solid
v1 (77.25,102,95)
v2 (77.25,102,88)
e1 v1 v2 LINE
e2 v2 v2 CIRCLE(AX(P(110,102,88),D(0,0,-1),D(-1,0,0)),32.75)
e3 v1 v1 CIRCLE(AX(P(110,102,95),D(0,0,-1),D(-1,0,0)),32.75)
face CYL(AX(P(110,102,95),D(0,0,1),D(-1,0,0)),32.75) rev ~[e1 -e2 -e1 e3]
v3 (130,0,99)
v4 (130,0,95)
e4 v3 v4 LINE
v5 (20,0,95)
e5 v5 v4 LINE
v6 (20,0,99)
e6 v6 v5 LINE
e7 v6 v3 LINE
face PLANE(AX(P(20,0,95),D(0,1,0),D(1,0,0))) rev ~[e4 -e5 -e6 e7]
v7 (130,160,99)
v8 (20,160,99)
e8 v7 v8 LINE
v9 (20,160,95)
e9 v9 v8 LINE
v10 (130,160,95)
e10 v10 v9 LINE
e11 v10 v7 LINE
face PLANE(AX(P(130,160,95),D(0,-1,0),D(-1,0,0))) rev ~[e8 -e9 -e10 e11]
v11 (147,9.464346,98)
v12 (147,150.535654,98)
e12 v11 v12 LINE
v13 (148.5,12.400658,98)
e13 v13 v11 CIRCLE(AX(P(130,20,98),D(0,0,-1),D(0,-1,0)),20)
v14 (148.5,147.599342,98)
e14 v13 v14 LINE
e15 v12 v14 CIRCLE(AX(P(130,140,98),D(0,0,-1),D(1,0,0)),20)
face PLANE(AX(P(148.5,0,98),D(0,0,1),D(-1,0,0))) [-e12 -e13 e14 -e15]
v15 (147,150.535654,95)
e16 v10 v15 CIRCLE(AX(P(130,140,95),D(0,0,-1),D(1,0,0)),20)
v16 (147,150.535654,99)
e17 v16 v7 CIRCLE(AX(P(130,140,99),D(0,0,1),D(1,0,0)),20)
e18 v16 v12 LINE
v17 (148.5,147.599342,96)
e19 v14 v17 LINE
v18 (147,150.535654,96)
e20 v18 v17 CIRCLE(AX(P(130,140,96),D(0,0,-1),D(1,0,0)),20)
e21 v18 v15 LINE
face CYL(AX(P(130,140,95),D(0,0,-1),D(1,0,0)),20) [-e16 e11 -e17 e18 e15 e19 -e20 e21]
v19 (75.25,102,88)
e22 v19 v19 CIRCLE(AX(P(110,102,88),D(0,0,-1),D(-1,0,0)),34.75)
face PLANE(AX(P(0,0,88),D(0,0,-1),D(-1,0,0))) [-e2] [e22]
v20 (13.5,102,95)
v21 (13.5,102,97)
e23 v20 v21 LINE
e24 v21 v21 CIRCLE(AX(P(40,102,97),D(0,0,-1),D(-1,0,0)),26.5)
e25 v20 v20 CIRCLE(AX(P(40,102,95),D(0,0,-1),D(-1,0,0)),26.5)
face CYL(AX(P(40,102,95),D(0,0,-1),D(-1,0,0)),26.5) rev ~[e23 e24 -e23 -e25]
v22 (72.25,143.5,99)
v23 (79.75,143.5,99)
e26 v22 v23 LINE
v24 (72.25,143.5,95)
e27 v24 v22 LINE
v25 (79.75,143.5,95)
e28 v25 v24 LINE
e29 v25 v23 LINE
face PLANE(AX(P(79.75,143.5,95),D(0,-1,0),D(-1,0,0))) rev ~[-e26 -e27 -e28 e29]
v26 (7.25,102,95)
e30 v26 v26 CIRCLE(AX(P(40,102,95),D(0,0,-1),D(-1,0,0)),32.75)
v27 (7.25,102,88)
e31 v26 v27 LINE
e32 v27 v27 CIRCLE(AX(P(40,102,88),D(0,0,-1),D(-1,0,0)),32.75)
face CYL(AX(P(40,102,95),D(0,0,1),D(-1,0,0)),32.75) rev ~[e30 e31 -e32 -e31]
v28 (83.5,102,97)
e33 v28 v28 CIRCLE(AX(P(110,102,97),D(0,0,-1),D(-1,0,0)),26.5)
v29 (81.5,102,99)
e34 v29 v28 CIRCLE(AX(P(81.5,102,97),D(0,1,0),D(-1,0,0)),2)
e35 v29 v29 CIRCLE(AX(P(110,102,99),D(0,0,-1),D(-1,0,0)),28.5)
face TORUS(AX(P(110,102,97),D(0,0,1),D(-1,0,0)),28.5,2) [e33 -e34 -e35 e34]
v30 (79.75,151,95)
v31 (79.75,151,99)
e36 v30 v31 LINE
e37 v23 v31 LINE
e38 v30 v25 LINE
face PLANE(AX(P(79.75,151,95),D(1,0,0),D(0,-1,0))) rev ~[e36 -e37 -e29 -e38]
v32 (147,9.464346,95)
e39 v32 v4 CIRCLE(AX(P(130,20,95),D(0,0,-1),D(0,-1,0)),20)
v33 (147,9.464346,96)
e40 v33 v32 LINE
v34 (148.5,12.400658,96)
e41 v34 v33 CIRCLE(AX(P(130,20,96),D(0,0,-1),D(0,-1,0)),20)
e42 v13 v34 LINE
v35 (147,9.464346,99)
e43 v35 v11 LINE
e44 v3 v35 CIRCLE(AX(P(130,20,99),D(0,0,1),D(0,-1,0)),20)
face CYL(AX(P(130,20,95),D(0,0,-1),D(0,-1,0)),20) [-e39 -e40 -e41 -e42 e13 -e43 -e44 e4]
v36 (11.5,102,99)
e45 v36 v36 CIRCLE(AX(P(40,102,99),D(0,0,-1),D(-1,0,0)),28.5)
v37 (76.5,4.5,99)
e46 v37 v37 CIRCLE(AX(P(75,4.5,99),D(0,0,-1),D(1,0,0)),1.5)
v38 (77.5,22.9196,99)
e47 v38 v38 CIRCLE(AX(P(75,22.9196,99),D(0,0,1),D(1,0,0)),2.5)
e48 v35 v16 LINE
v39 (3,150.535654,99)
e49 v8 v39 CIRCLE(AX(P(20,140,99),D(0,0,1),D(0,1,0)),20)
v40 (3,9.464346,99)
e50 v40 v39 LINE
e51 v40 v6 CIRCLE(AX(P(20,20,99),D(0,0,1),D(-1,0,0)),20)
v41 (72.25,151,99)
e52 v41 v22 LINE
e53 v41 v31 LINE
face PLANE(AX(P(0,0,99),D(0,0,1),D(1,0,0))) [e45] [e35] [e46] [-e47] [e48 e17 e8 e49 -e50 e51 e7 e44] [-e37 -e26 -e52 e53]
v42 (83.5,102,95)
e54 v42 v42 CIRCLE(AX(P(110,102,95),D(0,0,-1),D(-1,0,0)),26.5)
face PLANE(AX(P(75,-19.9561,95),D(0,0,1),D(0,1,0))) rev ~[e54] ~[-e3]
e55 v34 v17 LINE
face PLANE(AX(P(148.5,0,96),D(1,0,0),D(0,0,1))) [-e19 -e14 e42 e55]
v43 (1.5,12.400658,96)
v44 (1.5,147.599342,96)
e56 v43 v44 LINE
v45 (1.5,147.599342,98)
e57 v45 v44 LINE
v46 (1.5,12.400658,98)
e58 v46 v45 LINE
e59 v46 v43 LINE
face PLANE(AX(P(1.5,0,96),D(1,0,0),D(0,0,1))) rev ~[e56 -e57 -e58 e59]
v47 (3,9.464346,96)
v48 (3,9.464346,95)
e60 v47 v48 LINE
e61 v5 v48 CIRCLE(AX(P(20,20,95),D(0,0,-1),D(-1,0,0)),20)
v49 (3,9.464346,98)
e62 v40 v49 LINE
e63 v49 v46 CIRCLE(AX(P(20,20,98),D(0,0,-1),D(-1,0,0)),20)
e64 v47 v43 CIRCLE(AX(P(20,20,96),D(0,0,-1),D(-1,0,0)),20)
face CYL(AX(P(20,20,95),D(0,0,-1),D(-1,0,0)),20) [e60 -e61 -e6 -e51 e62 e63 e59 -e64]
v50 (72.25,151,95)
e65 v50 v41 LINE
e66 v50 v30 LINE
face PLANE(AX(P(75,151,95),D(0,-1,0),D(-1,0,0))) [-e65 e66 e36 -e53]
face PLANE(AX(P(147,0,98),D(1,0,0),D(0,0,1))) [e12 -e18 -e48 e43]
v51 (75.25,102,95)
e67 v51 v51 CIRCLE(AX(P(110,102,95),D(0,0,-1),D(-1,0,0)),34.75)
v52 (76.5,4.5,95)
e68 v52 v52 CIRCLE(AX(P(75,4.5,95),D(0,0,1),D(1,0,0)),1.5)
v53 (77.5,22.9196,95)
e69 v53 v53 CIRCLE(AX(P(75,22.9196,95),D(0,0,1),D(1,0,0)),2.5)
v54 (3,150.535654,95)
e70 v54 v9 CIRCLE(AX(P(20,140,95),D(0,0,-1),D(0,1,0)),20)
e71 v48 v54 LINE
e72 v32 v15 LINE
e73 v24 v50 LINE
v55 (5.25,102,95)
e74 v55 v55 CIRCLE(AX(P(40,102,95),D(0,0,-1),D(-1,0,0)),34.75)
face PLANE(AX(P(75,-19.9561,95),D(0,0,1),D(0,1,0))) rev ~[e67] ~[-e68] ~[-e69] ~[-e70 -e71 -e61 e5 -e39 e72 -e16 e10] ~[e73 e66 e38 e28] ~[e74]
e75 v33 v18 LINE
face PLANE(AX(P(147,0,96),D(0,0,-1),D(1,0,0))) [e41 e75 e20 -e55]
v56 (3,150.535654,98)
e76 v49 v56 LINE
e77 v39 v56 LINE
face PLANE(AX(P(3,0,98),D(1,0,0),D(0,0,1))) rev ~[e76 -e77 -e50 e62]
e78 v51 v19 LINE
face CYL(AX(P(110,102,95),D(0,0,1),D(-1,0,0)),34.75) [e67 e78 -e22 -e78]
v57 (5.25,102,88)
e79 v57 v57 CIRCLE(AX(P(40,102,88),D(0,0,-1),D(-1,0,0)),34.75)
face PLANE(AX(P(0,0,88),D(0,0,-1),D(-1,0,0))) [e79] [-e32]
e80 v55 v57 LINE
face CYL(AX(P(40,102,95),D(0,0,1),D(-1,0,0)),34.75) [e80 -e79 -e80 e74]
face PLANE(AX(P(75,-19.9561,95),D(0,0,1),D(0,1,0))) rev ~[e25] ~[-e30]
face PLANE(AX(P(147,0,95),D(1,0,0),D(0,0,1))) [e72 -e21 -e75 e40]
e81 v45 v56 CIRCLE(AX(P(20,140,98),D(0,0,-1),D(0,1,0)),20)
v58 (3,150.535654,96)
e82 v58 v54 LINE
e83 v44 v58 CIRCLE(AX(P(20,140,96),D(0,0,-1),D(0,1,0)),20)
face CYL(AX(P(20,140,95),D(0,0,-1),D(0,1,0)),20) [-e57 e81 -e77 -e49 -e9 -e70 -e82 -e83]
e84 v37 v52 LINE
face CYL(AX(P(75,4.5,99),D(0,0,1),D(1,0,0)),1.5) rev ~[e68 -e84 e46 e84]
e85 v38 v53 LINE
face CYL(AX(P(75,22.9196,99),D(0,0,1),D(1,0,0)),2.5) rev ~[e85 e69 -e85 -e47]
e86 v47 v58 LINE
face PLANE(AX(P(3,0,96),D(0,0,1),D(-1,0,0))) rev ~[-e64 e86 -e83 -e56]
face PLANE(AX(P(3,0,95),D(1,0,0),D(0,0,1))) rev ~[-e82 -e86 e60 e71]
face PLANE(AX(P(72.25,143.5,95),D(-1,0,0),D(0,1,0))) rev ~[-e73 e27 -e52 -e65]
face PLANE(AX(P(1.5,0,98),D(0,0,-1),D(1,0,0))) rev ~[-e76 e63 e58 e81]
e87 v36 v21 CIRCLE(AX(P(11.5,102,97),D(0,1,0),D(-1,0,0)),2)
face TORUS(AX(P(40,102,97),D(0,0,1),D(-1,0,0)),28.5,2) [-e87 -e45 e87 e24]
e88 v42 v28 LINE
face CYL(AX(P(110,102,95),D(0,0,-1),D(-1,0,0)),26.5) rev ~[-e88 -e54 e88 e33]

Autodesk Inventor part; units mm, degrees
sketch "Sketch1" plane through (0, 0, 0) normal (0, 0, 1) x (1, 0, 0)
  line L0 (20, 0) -> (130, 0)
  line L1 (150, 20) -> (150, 140)
  line L2 (130, 160) -> (20, 160)
  line L3 (0, 140) -> (0, 20)
  arc A0 (20, 160) -> (0, 140) centre (20, 140) ccw
  arc A1 (150, 140) -> (130, 160) centre (130, 140) ccw
  arc A2 (130, 0) -> (150, 20) centre (130, 20) ccw
  arc A3 (0, 20) -> (20, 0) centre (20, 20) ccw
  point P0 (0, 0)
  point P1 (150, 160)
  point P2 (150, 0)
  point P3 (0, 160)
  dimension "d443" = 160
  dimension "d444" = 150
extrude "Extrusion1" add sketch "Sketch1" along normal blind 95
sketch "Sketch5" plane through (0, 0, 95) normal (0, 0, 1) x (1, 0, 0)
  line L0 (130, 157) -> (20, 157)
  arc A0 (20, 157) -> (3, 140) centre (20, 140) ccw
  line L1 (3, 140) -> (3, 20)
  arc A1 (3, 20) -> (20, 3) centre (20, 20) ccw
  line L2 (20, 3) -> (130, 3)
  arc A2 (130, 3) -> (147, 20) centre (130, 20) ccw
  line L3 (147, 20) -> (147, 140)
  arc A3 (147, 140) -> (130, 157) centre (130, 140) ccw
  point P0 (0, 0)
  point P1 (0, 165)
  point P2 (150, 165)
  point P3 (0, 160)
  point P4 (150, 160)
  point P5 (150, 0)
  dimension "d456" = 160
  dimension "d457" = 150
  dimension "d458" = 160
  dimension "d459" = 150
extrude "Extrusion2" cut sketch "Sketch5" against normal blind 92
sketch "Sketch7" plane through (0, 20, 0) normal (-1, 0, 0) x (0, 0, 1)
  circle A0 centre (47.5, 110) radius 7.8
  point P0 (95, 120)
  dimension "d455" = 15.6
extrude "Extrusion4" cut sketch "Sketch7" against normal blind 98
sketch "Boceto12" plane through (20, 0, 0) normal (0, -1, 0) x (1, 0, 0)
  circle A0 centre (81.375, 48) radius 12
  circle A1 centre (28.625, 48) radius 12
extrude "Extrusión6" cut sketch "Boceto12" against normal blind 5
sketch "Boceto36" plane through (20, 160, 0) normal (0, 1, 0) x (1, 0, 0)
  circle A0 centre (55, -47.7801) radius 15
  dimension "d388" = 30
extrude "Extrusión17" cut sketch "Boceto36" against normal blind 6
ref_plane "Plano de trabajo1" through (0, 0, -50) normal (0, 0, -1) x (-1, 0, 0)
ref_plane "Plano de trabajo4" through (203.75, 20, 0) normal (-1, 0, 0) x (0, 0, 1)
ref_plane "Plano de trabajo5" through (200, 20, 0) normal (1, 0, 0) x (0, 0, -1)
ref_plane "Plano de trabajo6" through (20, 210, 0) normal (0, 1, 0) x (1, 0, 0)
sketch "Boceto57" plane through (150, 20, 0) normal (1, 0, 0) x (0, 0, -1)
  circle A0 centre (-47.5, 110) radius 7.8
  dimension "d453" = 15.6
extrude "Extrusión26" cut sketch "Boceto57" against normal blind 10
sketch "Boceto61" plane through (0, 0, 0) normal (0, 0, -1) x (-1, 0, 0)
  circle A0 centre (-75, 128.3417) radius 7.5
  circle A1 centre (-74.9977, 103.4764) radius 7.5
  circle A2 centre (-74.9673, 78.5161) radius 7.5
  dimension "d399" = 15
extrude "Extrusión28" add sketch "Boceto61" along normal blind 4
sketch "Boceto64" plane through (20, 160, 0) normal (0, 1, 0) x (1, 0, 0)
  circle A0 centre (12, -12) radius 1.5
  circle A1 centre (98, -12) radius 1.5
  circle A2 centre (12, -83) radius 1.5
  circle A3 centre (98, -83) radius 1.5
  dimension "d417" = 3
  dimension "d418" = 3
  dimension "d468" = 3
  dimension "d469" = 3
extrude "Extrusión30" cut sketch "Boceto64" against normal blind 20
sketch "Boceto65" plane through (20, 0, 0) normal (0, -1, 0) x (1, 0, 0)
  circle A0 centre (14.995, 99.7655) radius 2.5
  circle A1 centre (94.995, 99.7655) radius 2.5
  circle A2 centre (14.995, 19.7655) radius 2.5
  circle A3 centre (94.995, 19.7655) radius 2.5
extrude "Extrusión31" cut sketch "Boceto65" against normal blind 10
sketch "Boceto66" plane through (20, 0, 0) normal (0, -1, 0) x (1, 0, 0)
  circle A0 centre (28.625, 48) radius 12 projected
  circle A1 centre (28.625, 48) radius 21
  circle A2 centre (81.375, 48) radius 12 projected
  circle A3 centre (81.375, 48) radius 21
  point P0 (-20, 0)
  dimension "d474" = 42
  dimension "d475" = 42
extrude "Extrusión32" cut sketch "Boceto66" against normal blind 10
sketch "Boceto67" plane through (20, 3, 95) normal (0, 1, 0) x (1, 0, 0)
  circle A0 centre (28.625, 47) radius 21 projected
  circle A1 centre (28.625, 47) radius 21
  circle A2 centre (28.625, 47) radius 25
  point P0 (-20, 95)
  dimension "d478" = 42
  dimension "d479" = 50
extrude "Extrusión33" add sketch "Boceto67" along normal blind 6
sketch "Boceto68" plane through (20, 3, 95) normal (0, 1, 0) x (1, 0, 0)
  circle A0 centre (81.375, 47) radius 21 projected
  circle A1 centre (81.375, 47) radius 25
  point P0 (-20, 95)
  dimension "d482" = 50
extrude "Extrusión34" add sketch "Boceto68" along normal blind 6
fillet "Empalme1" radius 2 3 edges at (82.5, 128.3417, -4) (82.4977, 103.4764, -4) (82.4673, 78.5161, -4)
sketch "Boceto69" plane through (20, 160, 0) normal (0, 1, 0) x (1, 0, 0)
  line L0 (12, -22.2801) -> (82, -22.2801) projected
  line L1 (82, -22.2801) -> (82, -62.2801) projected
  line L2 (12, -62.2801) -> (12, -22.2801) projected
  line L3 (82, -62.2801) -> (12, -62.2801) projected
  point P0 (-20, 0)
extrude "Extrusión35" cut sketch "Boceto69" against normal blind 10
sketch "Boceto70" plane through (20, 3, 95) normal (0, 1, 0) x (1, 0, 0)
  point P0 (-20, 95)
sketch "Boceto71" plane through (20, 3, 95) normal (0, 1, 0) x (1, 0, 0)
  circle A0 centre (81.375, 47) radius 25 projected
  circle A1 centre (28.625, 47) radius 25 projected
  circle A2 centre (14.995, 75.2345) radius 2.5 projected
  circle A3 centre (94.995, 75.2345) radius 2.5 projected
  line L0 (110, 0) -> (0, 0) projected
  line L1 (110, 0) -> (110, 92) projected
  line L2 (110, 92) -> (0, 92) projected
  line L3 (0, 0) -> (0, 92) projected
  point P0 (-20, 95)
extrude "Extrusión36" add sketch "Boceto71" along normal up to surface (6 mm away)
sketch "Boceto72" plane through (147, 20, 95) normal (-1, 0, 0) x (0, 0, 1)
  circle A0 centre (-47.5, 110) radius 7.8 projected
  line L0 (-47.5, 110) -> (-47.5, 126.557)
  line L1 (-47.5, 126.557) -> (-53.5, 126.557)
  line L2 (-53.5, 126.557) -> (-41.5, 126.557)
  line L3 (-53.5, 126.557) -> (-41.5, 126.557)
  line L4 (-41.5, 126.557) -> (-41.5, 131.557)
  line L5 (-41.5, 131.557) -> (-53.5, 131.557)
  line L6 (-53.5, 131.557) -> (-53.5, 126.557)
  line L7 (-47.5, 126.557) -> (-47.5, 115.307)
  line L8 (-47.5, 115.307) -> (-36.0059, 115.307)
  line L9 (-47.5, 120.614) -> (-47.5, 104.057)
  line L10 (-47.5, 104.057) -> (-53.5, 104.057)
  line L11 (-53.5, 104.057) -> (-41.5, 104.057)
  line L12 (-53.5, 104.057) -> (-41.5, 104.057)
  line L13 (-41.5, 104.057) -> (-41.5, 99.057)
  line L14 (-41.5, 99.057) -> (-53.5, 99.057)
  line L15 (-53.5, 99.057) -> (-53.5, 104.057)
  line L16 (-47.5, 104.057) -> (-47.5, 115.307)
  point P0 (-95, -20)
  dimension "d490" = 16.557
  dimension "d491" = 6
  dimension "d492" = 12
  dimension "d493" = 12
  dimension "d494" = 5
  dimension "d497" = 11.25
extrude "Extrusión37" add sketch "Boceto72" along normal blind 9 contours L1 L6 L5 L4 L2
extrude "Extrusión38" add sketch "Boceto72" along normal up to surface (9 mm away) contours L11 L13 L14 L15 L10 A0 | A0 L10 L11
sketch "Boceto73" plane through (0, 0, 95) normal (0, 0, 1) x (1, 0, 0)
  arc A0 (150, 140) -> (130, 160) centre (130, 140) ccw projected
  line L0 (130, 160) -> (150, 160)
  line L1 (150, 160) -> (150, 140)
  point P0 (0, 0)
extrude "Extrusión39" cut sketch "Boceto73" against normal blind 1200
ref_plane "Plano de trabajo20" through (75, 0, 0) normal (1, 0, 0) x (0, 1, 0)
mirror "Simetría1" about plane through (75, 0, 0) normal (1, 0, 0) of "Extrusión37", "Extrusión38"
mirror "Simetría2" about plane through (75, 0, 0) normal (1, 0, 0) of "Extrusión39"
sketch "Boceto74" plane through (138, 20, 95) normal (-1, 0, 0) x (0, 0, 1)
  arc A0 (-48, 129.616) -> (-47, 129.616) centre (-47.5, 128.75) ccw projected
  circle A1 centre (-47.5, 128.75) radius 1
  point P0 (-95, -20)
extrude "Extrusión40" cut sketch "Boceto74" along normal blind 133 and the other way blind 8
sketch "Boceto75" plane through (138, 119.057, 41.5) normal (-1, 0, 0) x (0, 0, 1)
  arc A0 (6.5, 1.827) -> (5.5, 1.827) centre (6, 2.693) ccw projected
  circle A1 centre (6, 2.693) radius 1
  point P0 (-41.5, -119.057)
  dimension "d507" = 2
extrude "Extrusión41" cut sketch "Boceto75" along normal blind 134 and the other way blind 9
sketch "Boceto76" plane through (0, 0, 95) normal (0, 0, 1) x (1, 0, 0)
  line L0 (150, 20) -> (150, 140) projected
  line L1 (147, 140) -> (147, 20) projected
  line L2 (3, 20) -> (3, 140) projected
  line L3 (0, 140) -> (0, 20) projected
  line L4 (0, 140) -> (3, 140)
  line L5 (0, 20) -> (3, 20)
  line L6 (147, 20) -> (150, 20)
  line L7 (147, 140) -> (147, 20) projected
  line L8 (147, 140) -> (150, 140)
  point P0 (0, 0)
extrude "Extrusión42" add sketch "Boceto76" along normal blind 4
sketch "Boceto77" plane through (147, 20, 3) normal (-1, 0, 0) x (0, 0, 1)
  line L0 (96, 0) -> (96, 120) projected
  line L1 (96, 120) -> (95, 120)
  line L2 (92, 120) -> (96, 120) projected
  line L3 (95, 120) -> (93, 120)
  line L4 (93, 120) -> (93, 0)
  line L5 (93, 0) -> (95, 0)
  line L6 (95, 0) -> (95, 120)
  point P0 (-3, -20)
  dimension "d514" = 1
  dimension "d515" = 2
extrude "Extrusión43" cut sketch "Boceto77" against normal blind 1.5
extrude "Extrusión44" cut sketch "Boceto77" along normal blind 1.5 from surface at 144
sketch "Boceto78" plane through (0, 0, 95) normal (0, 0, 1) x (1, 0, 0)
  line L0 (20, 9) -> (130, 9) projected
  line L1 (75, 9) -> (75, 0)
  circle A0 centre (75, 4.5) radius 1.5
  point P0 (0, 0)
  dimension "d520" = 3
extrude "Extrusión45" cut sketch "Boceto78" against normal blind 10
sketch "Boceto79" plane through (0, 0, 95) normal (0, 0, 1) x (1, 0, 0)
  line L0 (130, 160) -> (20, 160) projected
  arc A0 (20, 160) -> (0, 140) centre (20, 140) ccw projected
  line L1 (0, 140) -> (0, 20) projected
  arc A1 (0, 20) -> (20, 0) centre (20, 20) ccw projected
  line L2 (20, 0) -> (130, 0) projected
  arc A2 (130, 0) -> (150, 20) centre (130, 20) ccw projected
  line L3 (150, 20) -> (150, 140) projected
  arc A3 (150, 140) -> (130, 160) centre (130, 140) ccw projected
  point P0 (0, 0)
extrude "Extrusión46" add sketch "Boceto79" along normal blind 4
sketch "Boceto80" plane through (75, 0, 0) normal (1, 0, 0) x (0, 1, 0)
  line L0 (140, 99) -> (20, 99) projected
  line L1 (20, 95) -> (20, 3) projected
  line L2 (20, 99) -> (20, 95)
  line L3 (-19.9561, 95) -> (216.2183, 95)
  line L4 (216.2183, 95) -> (216.2183, -18.3068)
  line L5 (216.2183, -18.3068) -> (-19.9561, -18.3068)
  line L6 (-19.9561, -18.3068) -> (-19.9561, 95)
  point P0 (0, 0)
  dimension "d525" = 4
extrude "Extrusión47" cut sketch "Boceto80" along normal mid plane 300
sketch "Boceto81" plane through (150, 20, 99) normal (1, 0, 0) x (0, 0, -1)
  line L0 (4, 140) -> (4, 120) projected
  line L1 (4, 140) -> (4, 137)
  line L2 (4, 137) -> (3, 137)
  line L3 (3, 137) -> (3, 138.5)
  line L4 (3, 138.5) -> (1, 138.5)
  line L5 (1, 138.5) -> (1, 137)
  line L6 (1, 137) -> (0, 137)
  line L7 (0, 140) -> (0, 120) projected
  line L8 (0, 137) -> (0, 140)
  line L9 (0, 140) -> (4, 140)
  line L10 (4, 0) -> (4, 120) projected
  line L11 (4, 60) -> (-16.1997, 60)
  line L12 (4, -20) -> (4, 0)
  line L13 (4, -20) -> (4, -17)
  line L14 (4, -17) -> (3, -17)
  line L15 (3, -17) -> (3, -18.5)
  line L16 (3, -18.5) -> (1, -18.5)
  line L17 (1, -18.5) -> (1, -17)
  line L18 (1, -17) -> (0, -17)
  line L19 (0, -20) -> (0, 0)
  line L20 (0, -17) -> (0, -20)
  line L21 (0, -20) -> (4, -20)
  point P0 (99, -20)
  dimension "d528" = 3
  dimension "d529" = 1
  dimension "d530" = 1.5
  dimension "d531" = 2
  dimension "d532" = 1.5
  dimension "d533" = 1
sketch "Boceto83" plane through (20, 0, 99) normal (0, -1, 0) x (1, 0, 0)
  line L0 (130, -4) -> (110, -4) projected
  line L1 (130, -4) -> (127, -4)
  line L2 (127, -4) -> (127, -3)
  line L3 (127, -3) -> (128.5, -3)
  line L4 (128.5, -3) -> (128.5, -1)
  line L5 (128.5, -1) -> (127, -1)
  line L6 (127, -1) -> (127, 0)
  line L7 (130, 0) -> (110, 0) projected
  line L8 (127, 0) -> (130, 0)
  line L9 (130, -4) -> (130, 0) projected
  line L10 (130, 0) -> (130, -4)
  line L11 (0, 0) -> (110, 0) projected
  line L12 (55, 0) -> (55, -2)
  line L13 (-20, -4) -> (0, -4)
  line L14 (-20, -4) -> (-17, -4)
  line L15 (-17, -4) -> (-17, -3)
  line L16 (-17, -3) -> (-18.5, -3)
  line L17 (-18.5, -3) -> (-18.5, -1)
  line L18 (-18.5, -1) -> (-17, -1)
  line L19 (-17, -1) -> (-17, 0)
  line L20 (-20, 0) -> (0, 0)
  line L21 (-17, 0) -> (-20, 0)
  line L22 (-20, -4) -> (-20, 0)
  line L23 (-20, 0) -> (-20, -4)
  point P0 (-20, -99)
  dimension "d540" = 3
  dimension "d541" = 1
  dimension "d542" = 1.5
  dimension "d543" = 2
  dimension "d544" = 1.5
extrude "Extrusión50" cut sketch "Boceto83" against normal blind 200
sketch "Boceto84" plane through (0, 0, 99) normal (0, 0, 1) x (1, 0, 0)
  line L0 (20, 0) -> (130, 0) projected
  line L1 (75, 0) -> (75, 4.5)
  circle A0 centre (75, 4.5) radius 1.5
  point P0 (0, 0)
  dimension "d547" = 4.5
  dimension "d548" = 3
extrude "Extrusión51" cut sketch "Boceto84" against normal blind 200
sketch "Boceto85" plane through (0, 0, 95) normal (0, 0, -1) x (-1, 0, 0)
  circle A0 centre (-110, 102) radius 32.75
  circle A1 centre (-40, 102) radius 32.75
  circle A2 centre (-110, 102) radius 34.75
  circle A3 centre (-40, 102) radius 34.75
  point P0 (0, 0)
  dimension "d555" = 65.5
  dimension "d558" = 65.5
  dimension "d559" = 2
  dimension "d560" = 2
extrude "Extrusión52" add sketch "Boceto85" along normal blind 7
sketch "Boceto86" plane through (110, 102, 95) normal (0, 0, -1) x (-1, 0, 0)
  circle A0 centre (0, 0) radius 26.5
  circle A1 centre (70, 0) radius 26.5
  point P0 (110, -102)
  dimension "d563" = 53
  dimension "d564" = 53
extrude "Extrusión53" cut sketch "Boceto86" against normal blind 8
fillet "Empalme2" radius 2 2 edges at (66.5, 102, 99) (136.5, 102, 99)
sketch "Boceto87" plane through (0, 0, 95) normal (0, 0, -1) x (-1, 0, 0)
  line L0 (-79.75, 151) -> (-75, 151)
  line L1 (-79.75, 151) -> (-79.75, 143.5)
  line L2 (-79.75, 143.5) -> (-72.25, 143.5)
  line L3 (-72.25, 143.5) -> (-72.25, 151)
  line L4 (-75, 151) -> (-72.25, 151)
  dimension "d587" = 4.75
  dimension "d593" = 7.5
  dimension "d594" = 7.5
extrude "Extrusión54" cut sketch "Boceto87" against normal blind 8
sketch "Boceto88" plane through (0, 0, 99) normal (0, 0, 1) x (1, 0, 0)
  circle A0 centre (75, 22.9196) radius 2.5
  point P0 (0, 0)
  dimension "d584" = 5
extrude "Extrusión55" cut sketch "Boceto88" against normal blind 10
equation "\"BendRadius\" = Thickness"
equation "\"BendReliefWidth\" = Thickness"
equation "\"BendReliefDepth\" = 0.5 * Thickness"
equation "\"CornerReliefSize\" = 4 * Thickness"
equation "\"MinimumRemnant\" = 2 * Thickness"
equation "\"TransitionRadius\" = BendRadius"
equation "\"JacobiRadiusSize\" = BendRadius"
equation "\"GapSize\" = Thickness"
equation "\"Thickness\" = 0.5"
properties part number "tapacuerpo"
